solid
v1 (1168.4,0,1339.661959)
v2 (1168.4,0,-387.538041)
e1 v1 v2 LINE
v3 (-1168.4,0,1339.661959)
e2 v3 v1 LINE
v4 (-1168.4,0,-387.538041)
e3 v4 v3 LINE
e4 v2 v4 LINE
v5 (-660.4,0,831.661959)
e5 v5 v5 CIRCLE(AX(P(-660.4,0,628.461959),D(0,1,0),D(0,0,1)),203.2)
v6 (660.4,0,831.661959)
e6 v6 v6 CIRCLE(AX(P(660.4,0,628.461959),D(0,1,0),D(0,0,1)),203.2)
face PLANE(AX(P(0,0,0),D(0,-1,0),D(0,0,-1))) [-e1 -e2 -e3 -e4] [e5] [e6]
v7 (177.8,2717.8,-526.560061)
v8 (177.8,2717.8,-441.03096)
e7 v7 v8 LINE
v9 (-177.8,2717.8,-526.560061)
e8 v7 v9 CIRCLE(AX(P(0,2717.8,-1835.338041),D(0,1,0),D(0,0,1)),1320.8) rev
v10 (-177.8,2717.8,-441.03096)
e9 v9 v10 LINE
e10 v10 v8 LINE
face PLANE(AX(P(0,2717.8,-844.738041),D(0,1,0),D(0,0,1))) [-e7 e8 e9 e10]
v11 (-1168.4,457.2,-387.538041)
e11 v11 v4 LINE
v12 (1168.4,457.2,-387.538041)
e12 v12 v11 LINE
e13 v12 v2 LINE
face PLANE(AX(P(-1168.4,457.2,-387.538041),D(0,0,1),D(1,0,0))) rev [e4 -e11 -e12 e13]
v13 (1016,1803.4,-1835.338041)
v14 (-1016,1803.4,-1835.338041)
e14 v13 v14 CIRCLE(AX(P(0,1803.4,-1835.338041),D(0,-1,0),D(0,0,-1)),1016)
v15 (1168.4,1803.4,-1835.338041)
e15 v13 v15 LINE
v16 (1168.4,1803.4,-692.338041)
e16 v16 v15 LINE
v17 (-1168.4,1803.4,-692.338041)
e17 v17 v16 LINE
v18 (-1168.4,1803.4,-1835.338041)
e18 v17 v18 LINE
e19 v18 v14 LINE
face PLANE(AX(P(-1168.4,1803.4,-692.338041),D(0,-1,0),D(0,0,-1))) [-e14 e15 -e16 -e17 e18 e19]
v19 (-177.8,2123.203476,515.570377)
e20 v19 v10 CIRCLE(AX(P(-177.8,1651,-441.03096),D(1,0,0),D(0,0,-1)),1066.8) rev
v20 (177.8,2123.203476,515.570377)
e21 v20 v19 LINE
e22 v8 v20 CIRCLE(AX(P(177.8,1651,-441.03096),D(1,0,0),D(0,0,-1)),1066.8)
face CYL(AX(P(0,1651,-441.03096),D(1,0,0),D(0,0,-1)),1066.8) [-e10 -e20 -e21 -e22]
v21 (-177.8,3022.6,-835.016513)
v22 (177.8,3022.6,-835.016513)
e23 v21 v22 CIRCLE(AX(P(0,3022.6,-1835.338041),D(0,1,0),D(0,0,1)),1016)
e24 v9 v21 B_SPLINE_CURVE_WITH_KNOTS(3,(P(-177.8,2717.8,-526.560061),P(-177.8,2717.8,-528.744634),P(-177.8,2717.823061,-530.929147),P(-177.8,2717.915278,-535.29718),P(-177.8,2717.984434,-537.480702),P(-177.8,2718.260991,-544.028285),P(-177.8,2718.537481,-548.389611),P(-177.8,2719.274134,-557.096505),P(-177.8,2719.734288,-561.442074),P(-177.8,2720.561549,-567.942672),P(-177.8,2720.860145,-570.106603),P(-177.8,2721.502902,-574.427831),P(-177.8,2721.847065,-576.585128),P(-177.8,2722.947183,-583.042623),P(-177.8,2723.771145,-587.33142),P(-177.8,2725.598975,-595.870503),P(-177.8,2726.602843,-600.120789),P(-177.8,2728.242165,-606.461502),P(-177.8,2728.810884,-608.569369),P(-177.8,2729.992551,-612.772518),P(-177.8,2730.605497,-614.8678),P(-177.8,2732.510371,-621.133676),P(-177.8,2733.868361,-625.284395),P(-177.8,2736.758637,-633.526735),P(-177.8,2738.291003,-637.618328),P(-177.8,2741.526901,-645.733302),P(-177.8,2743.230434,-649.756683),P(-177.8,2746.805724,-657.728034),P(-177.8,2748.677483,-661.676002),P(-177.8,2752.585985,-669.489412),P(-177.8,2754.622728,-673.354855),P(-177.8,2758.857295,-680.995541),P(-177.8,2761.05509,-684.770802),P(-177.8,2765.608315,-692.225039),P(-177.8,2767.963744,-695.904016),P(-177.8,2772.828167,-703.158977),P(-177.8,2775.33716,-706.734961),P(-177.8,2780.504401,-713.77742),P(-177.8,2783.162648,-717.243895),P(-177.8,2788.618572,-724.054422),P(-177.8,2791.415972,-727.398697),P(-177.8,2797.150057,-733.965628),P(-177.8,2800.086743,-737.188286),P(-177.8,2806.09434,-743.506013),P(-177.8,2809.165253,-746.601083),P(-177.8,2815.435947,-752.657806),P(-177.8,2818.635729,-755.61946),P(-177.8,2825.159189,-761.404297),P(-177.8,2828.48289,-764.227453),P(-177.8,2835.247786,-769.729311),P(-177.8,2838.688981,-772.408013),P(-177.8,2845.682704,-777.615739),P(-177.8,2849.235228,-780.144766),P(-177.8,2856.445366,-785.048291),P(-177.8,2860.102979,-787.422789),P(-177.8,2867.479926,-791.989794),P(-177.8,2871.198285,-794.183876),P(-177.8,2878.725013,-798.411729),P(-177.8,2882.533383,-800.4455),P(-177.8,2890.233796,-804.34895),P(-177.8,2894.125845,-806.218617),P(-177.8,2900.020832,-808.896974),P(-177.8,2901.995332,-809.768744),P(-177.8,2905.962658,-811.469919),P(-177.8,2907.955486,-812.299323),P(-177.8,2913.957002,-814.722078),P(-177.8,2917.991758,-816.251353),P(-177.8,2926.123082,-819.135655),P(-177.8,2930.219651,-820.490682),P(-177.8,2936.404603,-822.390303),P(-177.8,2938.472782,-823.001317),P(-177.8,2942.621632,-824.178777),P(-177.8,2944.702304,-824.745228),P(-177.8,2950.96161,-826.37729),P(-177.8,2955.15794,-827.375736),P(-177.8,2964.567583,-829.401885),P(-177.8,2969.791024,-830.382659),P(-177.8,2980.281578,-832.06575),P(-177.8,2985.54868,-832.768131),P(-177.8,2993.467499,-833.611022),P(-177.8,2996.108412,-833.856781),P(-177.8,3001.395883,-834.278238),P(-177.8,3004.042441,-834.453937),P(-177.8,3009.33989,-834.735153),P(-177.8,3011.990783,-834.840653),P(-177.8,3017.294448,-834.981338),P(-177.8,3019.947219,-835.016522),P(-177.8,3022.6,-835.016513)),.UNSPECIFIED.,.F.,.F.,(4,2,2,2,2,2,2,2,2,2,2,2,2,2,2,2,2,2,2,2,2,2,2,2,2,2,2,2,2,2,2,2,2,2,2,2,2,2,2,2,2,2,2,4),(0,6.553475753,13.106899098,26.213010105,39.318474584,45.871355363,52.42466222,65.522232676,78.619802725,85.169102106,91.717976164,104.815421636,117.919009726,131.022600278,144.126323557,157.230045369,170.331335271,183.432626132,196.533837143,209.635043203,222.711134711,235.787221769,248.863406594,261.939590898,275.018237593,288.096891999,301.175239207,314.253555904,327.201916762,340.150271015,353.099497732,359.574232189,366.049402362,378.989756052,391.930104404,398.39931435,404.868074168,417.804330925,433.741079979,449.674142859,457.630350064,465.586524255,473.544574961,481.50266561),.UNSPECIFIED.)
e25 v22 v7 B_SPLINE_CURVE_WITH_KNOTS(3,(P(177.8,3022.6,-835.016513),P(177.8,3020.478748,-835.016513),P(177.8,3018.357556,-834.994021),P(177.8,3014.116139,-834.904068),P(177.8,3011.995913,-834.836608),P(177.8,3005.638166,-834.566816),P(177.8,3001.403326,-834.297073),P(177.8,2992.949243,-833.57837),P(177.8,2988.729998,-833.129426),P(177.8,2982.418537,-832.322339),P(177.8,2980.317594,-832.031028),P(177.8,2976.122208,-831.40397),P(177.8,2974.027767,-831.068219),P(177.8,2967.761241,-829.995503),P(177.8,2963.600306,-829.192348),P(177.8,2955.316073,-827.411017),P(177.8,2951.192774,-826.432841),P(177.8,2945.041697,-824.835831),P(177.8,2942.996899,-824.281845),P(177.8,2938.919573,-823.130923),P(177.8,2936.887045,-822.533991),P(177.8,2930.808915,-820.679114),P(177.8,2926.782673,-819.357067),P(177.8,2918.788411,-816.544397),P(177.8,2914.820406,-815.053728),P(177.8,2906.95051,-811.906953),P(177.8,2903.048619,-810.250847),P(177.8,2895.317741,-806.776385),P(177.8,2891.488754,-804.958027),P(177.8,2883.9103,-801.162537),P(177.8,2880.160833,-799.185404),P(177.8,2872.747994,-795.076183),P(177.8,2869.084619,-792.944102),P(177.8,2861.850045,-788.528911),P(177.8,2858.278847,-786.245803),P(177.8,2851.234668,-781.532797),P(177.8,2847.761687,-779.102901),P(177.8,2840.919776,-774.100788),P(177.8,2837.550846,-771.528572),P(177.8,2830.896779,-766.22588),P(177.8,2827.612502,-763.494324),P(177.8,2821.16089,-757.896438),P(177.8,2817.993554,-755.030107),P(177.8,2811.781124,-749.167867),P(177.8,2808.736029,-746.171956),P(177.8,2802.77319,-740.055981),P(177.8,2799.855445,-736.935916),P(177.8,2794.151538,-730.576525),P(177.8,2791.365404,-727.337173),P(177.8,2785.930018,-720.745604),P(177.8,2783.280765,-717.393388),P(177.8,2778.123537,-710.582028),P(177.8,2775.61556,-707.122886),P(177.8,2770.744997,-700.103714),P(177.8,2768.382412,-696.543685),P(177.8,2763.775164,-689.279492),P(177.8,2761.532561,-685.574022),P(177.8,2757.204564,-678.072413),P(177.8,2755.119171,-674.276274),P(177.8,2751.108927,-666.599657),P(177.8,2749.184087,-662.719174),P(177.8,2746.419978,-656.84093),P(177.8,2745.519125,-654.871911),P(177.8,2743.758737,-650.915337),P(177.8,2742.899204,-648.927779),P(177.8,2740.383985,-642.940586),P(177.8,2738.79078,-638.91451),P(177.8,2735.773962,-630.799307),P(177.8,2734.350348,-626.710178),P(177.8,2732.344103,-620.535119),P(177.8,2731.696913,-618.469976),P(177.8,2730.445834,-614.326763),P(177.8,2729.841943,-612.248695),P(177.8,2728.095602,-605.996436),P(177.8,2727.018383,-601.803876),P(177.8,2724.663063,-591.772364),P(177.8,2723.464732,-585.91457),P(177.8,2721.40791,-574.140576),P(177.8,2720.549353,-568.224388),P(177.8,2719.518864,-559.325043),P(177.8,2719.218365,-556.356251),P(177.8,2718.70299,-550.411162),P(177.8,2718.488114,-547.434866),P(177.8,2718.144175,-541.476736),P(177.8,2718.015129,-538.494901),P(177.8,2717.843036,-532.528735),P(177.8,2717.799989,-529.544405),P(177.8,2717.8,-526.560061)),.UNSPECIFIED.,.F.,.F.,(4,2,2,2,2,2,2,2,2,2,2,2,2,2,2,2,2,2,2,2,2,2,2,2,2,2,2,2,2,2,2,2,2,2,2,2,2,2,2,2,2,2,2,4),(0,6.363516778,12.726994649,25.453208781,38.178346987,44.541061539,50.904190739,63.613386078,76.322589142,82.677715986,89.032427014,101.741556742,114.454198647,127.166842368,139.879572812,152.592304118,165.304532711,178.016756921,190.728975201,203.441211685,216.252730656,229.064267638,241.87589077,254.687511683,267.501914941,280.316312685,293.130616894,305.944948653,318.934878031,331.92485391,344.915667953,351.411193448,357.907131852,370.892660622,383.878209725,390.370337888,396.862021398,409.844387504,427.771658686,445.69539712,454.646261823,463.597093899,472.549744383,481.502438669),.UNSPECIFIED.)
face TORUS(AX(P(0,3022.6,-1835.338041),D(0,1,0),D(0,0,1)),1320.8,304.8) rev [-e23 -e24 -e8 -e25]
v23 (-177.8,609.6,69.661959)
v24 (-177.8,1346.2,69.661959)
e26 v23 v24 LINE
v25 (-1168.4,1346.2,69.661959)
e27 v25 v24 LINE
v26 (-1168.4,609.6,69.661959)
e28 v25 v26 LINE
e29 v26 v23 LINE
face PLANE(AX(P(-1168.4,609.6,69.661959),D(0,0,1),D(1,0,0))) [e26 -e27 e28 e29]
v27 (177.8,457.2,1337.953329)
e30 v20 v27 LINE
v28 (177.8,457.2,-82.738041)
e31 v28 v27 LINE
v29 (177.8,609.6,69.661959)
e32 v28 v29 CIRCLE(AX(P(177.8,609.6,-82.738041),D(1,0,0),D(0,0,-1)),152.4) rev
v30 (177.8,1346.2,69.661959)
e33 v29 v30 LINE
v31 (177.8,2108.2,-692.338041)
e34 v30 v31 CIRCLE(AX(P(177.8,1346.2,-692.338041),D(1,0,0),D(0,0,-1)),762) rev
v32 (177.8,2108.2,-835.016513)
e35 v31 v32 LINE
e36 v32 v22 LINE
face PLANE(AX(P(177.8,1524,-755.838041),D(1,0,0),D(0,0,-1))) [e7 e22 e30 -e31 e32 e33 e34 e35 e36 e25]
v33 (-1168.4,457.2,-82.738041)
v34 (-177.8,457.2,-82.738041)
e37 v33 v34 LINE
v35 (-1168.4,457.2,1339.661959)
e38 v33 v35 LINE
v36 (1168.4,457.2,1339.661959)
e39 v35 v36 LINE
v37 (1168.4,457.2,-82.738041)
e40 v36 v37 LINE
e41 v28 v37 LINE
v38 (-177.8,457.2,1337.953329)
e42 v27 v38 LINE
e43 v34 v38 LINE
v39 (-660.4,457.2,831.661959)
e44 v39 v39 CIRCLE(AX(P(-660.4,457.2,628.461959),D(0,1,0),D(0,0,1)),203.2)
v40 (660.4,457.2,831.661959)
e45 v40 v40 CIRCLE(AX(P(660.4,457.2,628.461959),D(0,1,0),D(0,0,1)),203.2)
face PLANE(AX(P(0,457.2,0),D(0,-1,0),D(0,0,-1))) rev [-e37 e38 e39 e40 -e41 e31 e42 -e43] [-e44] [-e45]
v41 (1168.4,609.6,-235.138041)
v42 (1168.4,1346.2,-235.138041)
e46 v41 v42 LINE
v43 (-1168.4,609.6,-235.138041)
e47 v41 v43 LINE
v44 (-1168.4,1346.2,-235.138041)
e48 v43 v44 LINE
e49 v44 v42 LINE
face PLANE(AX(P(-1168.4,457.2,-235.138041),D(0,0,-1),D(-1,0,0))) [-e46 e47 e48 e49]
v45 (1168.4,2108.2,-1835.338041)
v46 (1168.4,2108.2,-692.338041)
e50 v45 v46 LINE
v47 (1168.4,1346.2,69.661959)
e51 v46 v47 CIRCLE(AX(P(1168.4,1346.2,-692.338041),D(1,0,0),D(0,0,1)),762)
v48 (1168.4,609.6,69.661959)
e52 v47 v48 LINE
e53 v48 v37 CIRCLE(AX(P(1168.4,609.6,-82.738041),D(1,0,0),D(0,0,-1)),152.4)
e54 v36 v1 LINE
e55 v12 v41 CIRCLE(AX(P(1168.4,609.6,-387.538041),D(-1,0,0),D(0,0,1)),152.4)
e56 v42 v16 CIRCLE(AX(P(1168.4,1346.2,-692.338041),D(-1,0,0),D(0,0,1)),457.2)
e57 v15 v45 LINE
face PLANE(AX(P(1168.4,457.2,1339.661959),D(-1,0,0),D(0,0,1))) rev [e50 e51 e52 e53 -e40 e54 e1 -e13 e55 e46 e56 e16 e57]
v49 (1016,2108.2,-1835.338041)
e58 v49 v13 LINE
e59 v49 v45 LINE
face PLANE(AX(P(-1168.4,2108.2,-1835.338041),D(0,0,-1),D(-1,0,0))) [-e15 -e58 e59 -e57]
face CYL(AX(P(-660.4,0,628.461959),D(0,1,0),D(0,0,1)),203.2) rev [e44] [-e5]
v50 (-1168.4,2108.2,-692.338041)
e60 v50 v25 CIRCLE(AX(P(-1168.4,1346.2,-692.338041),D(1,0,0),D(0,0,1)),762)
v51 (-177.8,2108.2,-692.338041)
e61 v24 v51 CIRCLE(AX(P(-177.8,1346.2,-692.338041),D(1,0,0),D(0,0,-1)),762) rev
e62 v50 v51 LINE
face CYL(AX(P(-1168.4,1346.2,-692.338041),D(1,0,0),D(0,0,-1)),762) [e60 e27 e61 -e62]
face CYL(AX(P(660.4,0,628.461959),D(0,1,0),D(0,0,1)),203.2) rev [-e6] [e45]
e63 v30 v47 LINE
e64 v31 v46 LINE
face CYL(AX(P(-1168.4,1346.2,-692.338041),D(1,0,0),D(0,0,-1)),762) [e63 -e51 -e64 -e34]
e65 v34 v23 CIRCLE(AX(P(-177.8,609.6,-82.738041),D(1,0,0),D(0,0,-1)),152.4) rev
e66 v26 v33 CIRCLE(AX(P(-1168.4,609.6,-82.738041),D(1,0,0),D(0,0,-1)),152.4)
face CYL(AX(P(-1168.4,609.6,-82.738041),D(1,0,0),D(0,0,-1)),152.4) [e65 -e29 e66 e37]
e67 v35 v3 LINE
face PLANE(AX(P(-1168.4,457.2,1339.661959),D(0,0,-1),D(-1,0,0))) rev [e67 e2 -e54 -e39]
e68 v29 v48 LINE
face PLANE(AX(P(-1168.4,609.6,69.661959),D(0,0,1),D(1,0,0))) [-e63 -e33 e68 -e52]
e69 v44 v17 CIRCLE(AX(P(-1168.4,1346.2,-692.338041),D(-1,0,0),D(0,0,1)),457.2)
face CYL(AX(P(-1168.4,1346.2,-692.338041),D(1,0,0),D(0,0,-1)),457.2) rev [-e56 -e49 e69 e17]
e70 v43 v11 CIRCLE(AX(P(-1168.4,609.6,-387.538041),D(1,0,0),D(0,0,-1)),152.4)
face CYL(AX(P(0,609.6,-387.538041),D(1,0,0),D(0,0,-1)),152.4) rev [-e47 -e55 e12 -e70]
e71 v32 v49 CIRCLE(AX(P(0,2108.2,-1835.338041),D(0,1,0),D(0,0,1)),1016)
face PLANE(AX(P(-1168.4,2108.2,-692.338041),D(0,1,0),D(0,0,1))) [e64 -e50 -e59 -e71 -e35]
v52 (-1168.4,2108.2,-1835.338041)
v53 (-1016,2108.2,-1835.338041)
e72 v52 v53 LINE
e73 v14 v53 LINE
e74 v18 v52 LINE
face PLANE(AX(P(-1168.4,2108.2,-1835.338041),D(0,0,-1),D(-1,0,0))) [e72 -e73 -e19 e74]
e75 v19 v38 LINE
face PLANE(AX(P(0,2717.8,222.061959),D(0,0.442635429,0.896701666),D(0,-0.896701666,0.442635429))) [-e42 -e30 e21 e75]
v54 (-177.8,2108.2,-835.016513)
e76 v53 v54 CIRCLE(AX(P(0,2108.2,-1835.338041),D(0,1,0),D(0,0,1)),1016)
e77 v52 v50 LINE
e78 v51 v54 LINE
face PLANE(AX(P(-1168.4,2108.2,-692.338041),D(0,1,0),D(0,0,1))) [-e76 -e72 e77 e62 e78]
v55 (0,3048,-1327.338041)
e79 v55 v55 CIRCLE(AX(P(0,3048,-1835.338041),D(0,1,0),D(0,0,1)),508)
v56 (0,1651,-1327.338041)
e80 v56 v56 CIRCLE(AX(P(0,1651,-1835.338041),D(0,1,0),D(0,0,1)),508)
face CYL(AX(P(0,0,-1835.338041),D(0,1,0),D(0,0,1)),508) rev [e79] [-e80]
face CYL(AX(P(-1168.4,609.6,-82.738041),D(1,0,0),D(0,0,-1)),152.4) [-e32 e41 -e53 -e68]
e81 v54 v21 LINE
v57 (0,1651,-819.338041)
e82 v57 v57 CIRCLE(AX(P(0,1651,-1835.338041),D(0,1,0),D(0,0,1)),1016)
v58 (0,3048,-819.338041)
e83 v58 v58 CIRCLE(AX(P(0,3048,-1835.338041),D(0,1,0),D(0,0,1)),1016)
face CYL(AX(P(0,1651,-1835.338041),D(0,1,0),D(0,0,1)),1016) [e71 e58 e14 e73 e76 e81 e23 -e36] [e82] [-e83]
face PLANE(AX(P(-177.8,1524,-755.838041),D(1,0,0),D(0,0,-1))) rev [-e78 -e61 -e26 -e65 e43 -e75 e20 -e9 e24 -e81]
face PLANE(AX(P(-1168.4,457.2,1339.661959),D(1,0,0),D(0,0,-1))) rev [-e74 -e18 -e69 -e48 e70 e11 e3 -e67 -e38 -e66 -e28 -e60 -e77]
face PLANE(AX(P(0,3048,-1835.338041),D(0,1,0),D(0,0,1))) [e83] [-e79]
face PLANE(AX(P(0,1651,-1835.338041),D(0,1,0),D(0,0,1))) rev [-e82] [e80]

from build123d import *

# Parameters (mm, degrees)
SKETCH1_W                = 2336.8
SKETCH1_H                = 1727.2
BOSS_EXTRUDE1_DEPTH      = 457.2
SKETCH2_R                = 203.2
CUT_EXTRUDE1_DEPTH       = 1836.452141677
BOSS_EXTRUDE2_DEPTH      = 2336.8
FILLET2_R                = 152.4
BOSS_EXTRUDE3_DEPTH      = 939.8
BOSS_EXTRUDE3_DEPTH_BACK = 457.2
SKETCH5_R                = 1016
SKETCH6_R                = 508
CUT_EXTRUDE2_DEPTH       = 4335.234786449
RIB1_START               = -177.8
RIB1_DEPTH               = 355.6
FILLET3_R                = 1066.8
FILLET4_R                = 304.8


# Read off the part's stored shape, not the designer's step: Rib1
with BuildPart() as part:
    # Sketch1 → Boss-Extrude1 (new body)
    with BuildSketch(Plane(origin=(0, 0, 0), x_dir=(1, 0, 0), z_dir=(0, 1, 0))):
        with Locations((0, -476.061958998)):
            Rectangle(SKETCH1_W, SKETCH1_H)
    extrude(amount=BOSS_EXTRUDE1_DEPTH)

    # Sketch2 → Cut-Extrude1 (cut, through all)
    with BuildSketch(Plane(origin=(0, 457.2, 0), x_dir=(1, 0, 0), z_dir=(0, 1, 0))):
        with Locations(Location((-660.4, -628.461958998, 0), (0, 0, 270))):
            Circle(SKETCH2_R)
        with Locations(Location((660.4, -628.461958998, 0), (0, 0, 270))):
            Circle(SKETCH2_R)
    extrude(amount=-CUT_EXTRUDE1_DEPTH, mode=Mode.SUBTRACT)

    # Sketch4 → Boss-Extrude2 (add, through all)
    with BuildSketch(Plane(origin=(1168.4, 0, 0), x_dir=(0, 0, -1), z_dir=(1, 0, 0))):
        with BuildLine():
            Line((235.138041002, 457.2), (235.138041002, 1346.2))
            ThreePointArc((235.138041002, 1346.2), (369.048820644, 1669.489220358), (692.338041002, 1803.4))
            Line((692.338041002, 1803.4), (1835.338041002, 1803.4))
            Line((1835.338041002, 1803.4), (1835.338041002, 2108.2))
            Line((1835.338041002, 2108.2), (692.338041002, 2108.2))
            ThreePointArc((692.338041002, 2108.2), (153.522673738, 1885.015367264), (-69.661958998, 1346.2))
            Line((-69.661958998, 1346.2), (-69.661958998, 609.6))
            ThreePointArc((-69.661958998, 609.6), (-25.025032451, 501.836926547), (82.738041002, 457.2))
            Line((82.738041002, 457.2), (235.138041002, 457.2))
        make_face()
    extrude(amount=-BOSS_EXTRUDE2_DEPTH)

    # Fillet2
    fillet2_edges = [part.edges().sort_by_distance(p)[0] for p in [
        (0, 457.2, -235.138041002),
    ]]
    fillet(fillet2_edges, radius=FILLET2_R - 0.0001)  # a hair under: the kernel refuses the full size

    # Sketch5 → Boss-Extrude3 (add, two sides: drawn at the far end of the back side and taken through both)
    with BuildSketch(Plane(origin=(0, 2108.2, 0), x_dir=(1, 0, 0), z_dir=(0, 1, 0)).offset(-BOSS_EXTRUDE3_DEPTH_BACK)):
        with Locations(Location((0, 1835.338041002, 0), (0, 0, 270))):
            Circle(SKETCH5_R)
    extrude(amount=BOSS_EXTRUDE3_DEPTH + BOSS_EXTRUDE3_DEPTH_BACK)

    # Sketch6 → Cut-Extrude2 (cut, through all)
    with BuildSketch(Plane(origin=(0, 3048, 0), x_dir=(1, 0, 0), z_dir=(0, 1, 0))):
        with Locations(Location((0, 1835.338041002, 0), (0, 0, 270))):
            Circle(SKETCH6_R)
    extrude(amount=-CUT_EXTRUDE2_DEPTH, mode=Mode.SUBTRACT)

    # Rib1 outline → Rib1 (add)
    with BuildSketch(Plane(origin=(0, 0, 0), x_dir=(0, 0, -1), z_dir=(1, 0, 0)).offset(RIB1_START)):
        with BuildLine():
            Line((837, 2717.8), (-222.061958998, 2717.8))
            Line((-222.061958998, 2717.8), (-1337.953329415, 457.2))
            Line((-1337.953329415, 457.2), (82.738041002, 457.2))
            ThreePointArc((82.738041002, 457.2), (-25.025032451, 501.836926547), (-69.661958998, 609.6))
            Line((-69.661958998, 609.6), (-69.661958998, 1346.2))
            ThreePointArc((-69.661958998, 1346.2), (153.522673738, 1885.015367264), (692.338041002, 2108.2))
            Line((692.338041002, 2108.2), (837, 2108.2))
            Line((837, 2108.2), (837, 2717.8))
        make_face()
    extrude(amount=RIB1_DEPTH)

    # Fillet3
    fillet3_edges = [part.edges().sort_by_distance(p)[0] for p in [
        (0, 2717.8, 222.061958998),
    ]]
    fillet(fillet3_edges, radius=FILLET3_R)

    # Fillet4
    fillet4_edges = [part.edges().sort_by_distance(p)[0] for p in [
        (89.244964108, 2717.8, -823.265248965),
    ]]
    fillet(fillet4_edges, radius=FILLET4_R)


solid = part.part
